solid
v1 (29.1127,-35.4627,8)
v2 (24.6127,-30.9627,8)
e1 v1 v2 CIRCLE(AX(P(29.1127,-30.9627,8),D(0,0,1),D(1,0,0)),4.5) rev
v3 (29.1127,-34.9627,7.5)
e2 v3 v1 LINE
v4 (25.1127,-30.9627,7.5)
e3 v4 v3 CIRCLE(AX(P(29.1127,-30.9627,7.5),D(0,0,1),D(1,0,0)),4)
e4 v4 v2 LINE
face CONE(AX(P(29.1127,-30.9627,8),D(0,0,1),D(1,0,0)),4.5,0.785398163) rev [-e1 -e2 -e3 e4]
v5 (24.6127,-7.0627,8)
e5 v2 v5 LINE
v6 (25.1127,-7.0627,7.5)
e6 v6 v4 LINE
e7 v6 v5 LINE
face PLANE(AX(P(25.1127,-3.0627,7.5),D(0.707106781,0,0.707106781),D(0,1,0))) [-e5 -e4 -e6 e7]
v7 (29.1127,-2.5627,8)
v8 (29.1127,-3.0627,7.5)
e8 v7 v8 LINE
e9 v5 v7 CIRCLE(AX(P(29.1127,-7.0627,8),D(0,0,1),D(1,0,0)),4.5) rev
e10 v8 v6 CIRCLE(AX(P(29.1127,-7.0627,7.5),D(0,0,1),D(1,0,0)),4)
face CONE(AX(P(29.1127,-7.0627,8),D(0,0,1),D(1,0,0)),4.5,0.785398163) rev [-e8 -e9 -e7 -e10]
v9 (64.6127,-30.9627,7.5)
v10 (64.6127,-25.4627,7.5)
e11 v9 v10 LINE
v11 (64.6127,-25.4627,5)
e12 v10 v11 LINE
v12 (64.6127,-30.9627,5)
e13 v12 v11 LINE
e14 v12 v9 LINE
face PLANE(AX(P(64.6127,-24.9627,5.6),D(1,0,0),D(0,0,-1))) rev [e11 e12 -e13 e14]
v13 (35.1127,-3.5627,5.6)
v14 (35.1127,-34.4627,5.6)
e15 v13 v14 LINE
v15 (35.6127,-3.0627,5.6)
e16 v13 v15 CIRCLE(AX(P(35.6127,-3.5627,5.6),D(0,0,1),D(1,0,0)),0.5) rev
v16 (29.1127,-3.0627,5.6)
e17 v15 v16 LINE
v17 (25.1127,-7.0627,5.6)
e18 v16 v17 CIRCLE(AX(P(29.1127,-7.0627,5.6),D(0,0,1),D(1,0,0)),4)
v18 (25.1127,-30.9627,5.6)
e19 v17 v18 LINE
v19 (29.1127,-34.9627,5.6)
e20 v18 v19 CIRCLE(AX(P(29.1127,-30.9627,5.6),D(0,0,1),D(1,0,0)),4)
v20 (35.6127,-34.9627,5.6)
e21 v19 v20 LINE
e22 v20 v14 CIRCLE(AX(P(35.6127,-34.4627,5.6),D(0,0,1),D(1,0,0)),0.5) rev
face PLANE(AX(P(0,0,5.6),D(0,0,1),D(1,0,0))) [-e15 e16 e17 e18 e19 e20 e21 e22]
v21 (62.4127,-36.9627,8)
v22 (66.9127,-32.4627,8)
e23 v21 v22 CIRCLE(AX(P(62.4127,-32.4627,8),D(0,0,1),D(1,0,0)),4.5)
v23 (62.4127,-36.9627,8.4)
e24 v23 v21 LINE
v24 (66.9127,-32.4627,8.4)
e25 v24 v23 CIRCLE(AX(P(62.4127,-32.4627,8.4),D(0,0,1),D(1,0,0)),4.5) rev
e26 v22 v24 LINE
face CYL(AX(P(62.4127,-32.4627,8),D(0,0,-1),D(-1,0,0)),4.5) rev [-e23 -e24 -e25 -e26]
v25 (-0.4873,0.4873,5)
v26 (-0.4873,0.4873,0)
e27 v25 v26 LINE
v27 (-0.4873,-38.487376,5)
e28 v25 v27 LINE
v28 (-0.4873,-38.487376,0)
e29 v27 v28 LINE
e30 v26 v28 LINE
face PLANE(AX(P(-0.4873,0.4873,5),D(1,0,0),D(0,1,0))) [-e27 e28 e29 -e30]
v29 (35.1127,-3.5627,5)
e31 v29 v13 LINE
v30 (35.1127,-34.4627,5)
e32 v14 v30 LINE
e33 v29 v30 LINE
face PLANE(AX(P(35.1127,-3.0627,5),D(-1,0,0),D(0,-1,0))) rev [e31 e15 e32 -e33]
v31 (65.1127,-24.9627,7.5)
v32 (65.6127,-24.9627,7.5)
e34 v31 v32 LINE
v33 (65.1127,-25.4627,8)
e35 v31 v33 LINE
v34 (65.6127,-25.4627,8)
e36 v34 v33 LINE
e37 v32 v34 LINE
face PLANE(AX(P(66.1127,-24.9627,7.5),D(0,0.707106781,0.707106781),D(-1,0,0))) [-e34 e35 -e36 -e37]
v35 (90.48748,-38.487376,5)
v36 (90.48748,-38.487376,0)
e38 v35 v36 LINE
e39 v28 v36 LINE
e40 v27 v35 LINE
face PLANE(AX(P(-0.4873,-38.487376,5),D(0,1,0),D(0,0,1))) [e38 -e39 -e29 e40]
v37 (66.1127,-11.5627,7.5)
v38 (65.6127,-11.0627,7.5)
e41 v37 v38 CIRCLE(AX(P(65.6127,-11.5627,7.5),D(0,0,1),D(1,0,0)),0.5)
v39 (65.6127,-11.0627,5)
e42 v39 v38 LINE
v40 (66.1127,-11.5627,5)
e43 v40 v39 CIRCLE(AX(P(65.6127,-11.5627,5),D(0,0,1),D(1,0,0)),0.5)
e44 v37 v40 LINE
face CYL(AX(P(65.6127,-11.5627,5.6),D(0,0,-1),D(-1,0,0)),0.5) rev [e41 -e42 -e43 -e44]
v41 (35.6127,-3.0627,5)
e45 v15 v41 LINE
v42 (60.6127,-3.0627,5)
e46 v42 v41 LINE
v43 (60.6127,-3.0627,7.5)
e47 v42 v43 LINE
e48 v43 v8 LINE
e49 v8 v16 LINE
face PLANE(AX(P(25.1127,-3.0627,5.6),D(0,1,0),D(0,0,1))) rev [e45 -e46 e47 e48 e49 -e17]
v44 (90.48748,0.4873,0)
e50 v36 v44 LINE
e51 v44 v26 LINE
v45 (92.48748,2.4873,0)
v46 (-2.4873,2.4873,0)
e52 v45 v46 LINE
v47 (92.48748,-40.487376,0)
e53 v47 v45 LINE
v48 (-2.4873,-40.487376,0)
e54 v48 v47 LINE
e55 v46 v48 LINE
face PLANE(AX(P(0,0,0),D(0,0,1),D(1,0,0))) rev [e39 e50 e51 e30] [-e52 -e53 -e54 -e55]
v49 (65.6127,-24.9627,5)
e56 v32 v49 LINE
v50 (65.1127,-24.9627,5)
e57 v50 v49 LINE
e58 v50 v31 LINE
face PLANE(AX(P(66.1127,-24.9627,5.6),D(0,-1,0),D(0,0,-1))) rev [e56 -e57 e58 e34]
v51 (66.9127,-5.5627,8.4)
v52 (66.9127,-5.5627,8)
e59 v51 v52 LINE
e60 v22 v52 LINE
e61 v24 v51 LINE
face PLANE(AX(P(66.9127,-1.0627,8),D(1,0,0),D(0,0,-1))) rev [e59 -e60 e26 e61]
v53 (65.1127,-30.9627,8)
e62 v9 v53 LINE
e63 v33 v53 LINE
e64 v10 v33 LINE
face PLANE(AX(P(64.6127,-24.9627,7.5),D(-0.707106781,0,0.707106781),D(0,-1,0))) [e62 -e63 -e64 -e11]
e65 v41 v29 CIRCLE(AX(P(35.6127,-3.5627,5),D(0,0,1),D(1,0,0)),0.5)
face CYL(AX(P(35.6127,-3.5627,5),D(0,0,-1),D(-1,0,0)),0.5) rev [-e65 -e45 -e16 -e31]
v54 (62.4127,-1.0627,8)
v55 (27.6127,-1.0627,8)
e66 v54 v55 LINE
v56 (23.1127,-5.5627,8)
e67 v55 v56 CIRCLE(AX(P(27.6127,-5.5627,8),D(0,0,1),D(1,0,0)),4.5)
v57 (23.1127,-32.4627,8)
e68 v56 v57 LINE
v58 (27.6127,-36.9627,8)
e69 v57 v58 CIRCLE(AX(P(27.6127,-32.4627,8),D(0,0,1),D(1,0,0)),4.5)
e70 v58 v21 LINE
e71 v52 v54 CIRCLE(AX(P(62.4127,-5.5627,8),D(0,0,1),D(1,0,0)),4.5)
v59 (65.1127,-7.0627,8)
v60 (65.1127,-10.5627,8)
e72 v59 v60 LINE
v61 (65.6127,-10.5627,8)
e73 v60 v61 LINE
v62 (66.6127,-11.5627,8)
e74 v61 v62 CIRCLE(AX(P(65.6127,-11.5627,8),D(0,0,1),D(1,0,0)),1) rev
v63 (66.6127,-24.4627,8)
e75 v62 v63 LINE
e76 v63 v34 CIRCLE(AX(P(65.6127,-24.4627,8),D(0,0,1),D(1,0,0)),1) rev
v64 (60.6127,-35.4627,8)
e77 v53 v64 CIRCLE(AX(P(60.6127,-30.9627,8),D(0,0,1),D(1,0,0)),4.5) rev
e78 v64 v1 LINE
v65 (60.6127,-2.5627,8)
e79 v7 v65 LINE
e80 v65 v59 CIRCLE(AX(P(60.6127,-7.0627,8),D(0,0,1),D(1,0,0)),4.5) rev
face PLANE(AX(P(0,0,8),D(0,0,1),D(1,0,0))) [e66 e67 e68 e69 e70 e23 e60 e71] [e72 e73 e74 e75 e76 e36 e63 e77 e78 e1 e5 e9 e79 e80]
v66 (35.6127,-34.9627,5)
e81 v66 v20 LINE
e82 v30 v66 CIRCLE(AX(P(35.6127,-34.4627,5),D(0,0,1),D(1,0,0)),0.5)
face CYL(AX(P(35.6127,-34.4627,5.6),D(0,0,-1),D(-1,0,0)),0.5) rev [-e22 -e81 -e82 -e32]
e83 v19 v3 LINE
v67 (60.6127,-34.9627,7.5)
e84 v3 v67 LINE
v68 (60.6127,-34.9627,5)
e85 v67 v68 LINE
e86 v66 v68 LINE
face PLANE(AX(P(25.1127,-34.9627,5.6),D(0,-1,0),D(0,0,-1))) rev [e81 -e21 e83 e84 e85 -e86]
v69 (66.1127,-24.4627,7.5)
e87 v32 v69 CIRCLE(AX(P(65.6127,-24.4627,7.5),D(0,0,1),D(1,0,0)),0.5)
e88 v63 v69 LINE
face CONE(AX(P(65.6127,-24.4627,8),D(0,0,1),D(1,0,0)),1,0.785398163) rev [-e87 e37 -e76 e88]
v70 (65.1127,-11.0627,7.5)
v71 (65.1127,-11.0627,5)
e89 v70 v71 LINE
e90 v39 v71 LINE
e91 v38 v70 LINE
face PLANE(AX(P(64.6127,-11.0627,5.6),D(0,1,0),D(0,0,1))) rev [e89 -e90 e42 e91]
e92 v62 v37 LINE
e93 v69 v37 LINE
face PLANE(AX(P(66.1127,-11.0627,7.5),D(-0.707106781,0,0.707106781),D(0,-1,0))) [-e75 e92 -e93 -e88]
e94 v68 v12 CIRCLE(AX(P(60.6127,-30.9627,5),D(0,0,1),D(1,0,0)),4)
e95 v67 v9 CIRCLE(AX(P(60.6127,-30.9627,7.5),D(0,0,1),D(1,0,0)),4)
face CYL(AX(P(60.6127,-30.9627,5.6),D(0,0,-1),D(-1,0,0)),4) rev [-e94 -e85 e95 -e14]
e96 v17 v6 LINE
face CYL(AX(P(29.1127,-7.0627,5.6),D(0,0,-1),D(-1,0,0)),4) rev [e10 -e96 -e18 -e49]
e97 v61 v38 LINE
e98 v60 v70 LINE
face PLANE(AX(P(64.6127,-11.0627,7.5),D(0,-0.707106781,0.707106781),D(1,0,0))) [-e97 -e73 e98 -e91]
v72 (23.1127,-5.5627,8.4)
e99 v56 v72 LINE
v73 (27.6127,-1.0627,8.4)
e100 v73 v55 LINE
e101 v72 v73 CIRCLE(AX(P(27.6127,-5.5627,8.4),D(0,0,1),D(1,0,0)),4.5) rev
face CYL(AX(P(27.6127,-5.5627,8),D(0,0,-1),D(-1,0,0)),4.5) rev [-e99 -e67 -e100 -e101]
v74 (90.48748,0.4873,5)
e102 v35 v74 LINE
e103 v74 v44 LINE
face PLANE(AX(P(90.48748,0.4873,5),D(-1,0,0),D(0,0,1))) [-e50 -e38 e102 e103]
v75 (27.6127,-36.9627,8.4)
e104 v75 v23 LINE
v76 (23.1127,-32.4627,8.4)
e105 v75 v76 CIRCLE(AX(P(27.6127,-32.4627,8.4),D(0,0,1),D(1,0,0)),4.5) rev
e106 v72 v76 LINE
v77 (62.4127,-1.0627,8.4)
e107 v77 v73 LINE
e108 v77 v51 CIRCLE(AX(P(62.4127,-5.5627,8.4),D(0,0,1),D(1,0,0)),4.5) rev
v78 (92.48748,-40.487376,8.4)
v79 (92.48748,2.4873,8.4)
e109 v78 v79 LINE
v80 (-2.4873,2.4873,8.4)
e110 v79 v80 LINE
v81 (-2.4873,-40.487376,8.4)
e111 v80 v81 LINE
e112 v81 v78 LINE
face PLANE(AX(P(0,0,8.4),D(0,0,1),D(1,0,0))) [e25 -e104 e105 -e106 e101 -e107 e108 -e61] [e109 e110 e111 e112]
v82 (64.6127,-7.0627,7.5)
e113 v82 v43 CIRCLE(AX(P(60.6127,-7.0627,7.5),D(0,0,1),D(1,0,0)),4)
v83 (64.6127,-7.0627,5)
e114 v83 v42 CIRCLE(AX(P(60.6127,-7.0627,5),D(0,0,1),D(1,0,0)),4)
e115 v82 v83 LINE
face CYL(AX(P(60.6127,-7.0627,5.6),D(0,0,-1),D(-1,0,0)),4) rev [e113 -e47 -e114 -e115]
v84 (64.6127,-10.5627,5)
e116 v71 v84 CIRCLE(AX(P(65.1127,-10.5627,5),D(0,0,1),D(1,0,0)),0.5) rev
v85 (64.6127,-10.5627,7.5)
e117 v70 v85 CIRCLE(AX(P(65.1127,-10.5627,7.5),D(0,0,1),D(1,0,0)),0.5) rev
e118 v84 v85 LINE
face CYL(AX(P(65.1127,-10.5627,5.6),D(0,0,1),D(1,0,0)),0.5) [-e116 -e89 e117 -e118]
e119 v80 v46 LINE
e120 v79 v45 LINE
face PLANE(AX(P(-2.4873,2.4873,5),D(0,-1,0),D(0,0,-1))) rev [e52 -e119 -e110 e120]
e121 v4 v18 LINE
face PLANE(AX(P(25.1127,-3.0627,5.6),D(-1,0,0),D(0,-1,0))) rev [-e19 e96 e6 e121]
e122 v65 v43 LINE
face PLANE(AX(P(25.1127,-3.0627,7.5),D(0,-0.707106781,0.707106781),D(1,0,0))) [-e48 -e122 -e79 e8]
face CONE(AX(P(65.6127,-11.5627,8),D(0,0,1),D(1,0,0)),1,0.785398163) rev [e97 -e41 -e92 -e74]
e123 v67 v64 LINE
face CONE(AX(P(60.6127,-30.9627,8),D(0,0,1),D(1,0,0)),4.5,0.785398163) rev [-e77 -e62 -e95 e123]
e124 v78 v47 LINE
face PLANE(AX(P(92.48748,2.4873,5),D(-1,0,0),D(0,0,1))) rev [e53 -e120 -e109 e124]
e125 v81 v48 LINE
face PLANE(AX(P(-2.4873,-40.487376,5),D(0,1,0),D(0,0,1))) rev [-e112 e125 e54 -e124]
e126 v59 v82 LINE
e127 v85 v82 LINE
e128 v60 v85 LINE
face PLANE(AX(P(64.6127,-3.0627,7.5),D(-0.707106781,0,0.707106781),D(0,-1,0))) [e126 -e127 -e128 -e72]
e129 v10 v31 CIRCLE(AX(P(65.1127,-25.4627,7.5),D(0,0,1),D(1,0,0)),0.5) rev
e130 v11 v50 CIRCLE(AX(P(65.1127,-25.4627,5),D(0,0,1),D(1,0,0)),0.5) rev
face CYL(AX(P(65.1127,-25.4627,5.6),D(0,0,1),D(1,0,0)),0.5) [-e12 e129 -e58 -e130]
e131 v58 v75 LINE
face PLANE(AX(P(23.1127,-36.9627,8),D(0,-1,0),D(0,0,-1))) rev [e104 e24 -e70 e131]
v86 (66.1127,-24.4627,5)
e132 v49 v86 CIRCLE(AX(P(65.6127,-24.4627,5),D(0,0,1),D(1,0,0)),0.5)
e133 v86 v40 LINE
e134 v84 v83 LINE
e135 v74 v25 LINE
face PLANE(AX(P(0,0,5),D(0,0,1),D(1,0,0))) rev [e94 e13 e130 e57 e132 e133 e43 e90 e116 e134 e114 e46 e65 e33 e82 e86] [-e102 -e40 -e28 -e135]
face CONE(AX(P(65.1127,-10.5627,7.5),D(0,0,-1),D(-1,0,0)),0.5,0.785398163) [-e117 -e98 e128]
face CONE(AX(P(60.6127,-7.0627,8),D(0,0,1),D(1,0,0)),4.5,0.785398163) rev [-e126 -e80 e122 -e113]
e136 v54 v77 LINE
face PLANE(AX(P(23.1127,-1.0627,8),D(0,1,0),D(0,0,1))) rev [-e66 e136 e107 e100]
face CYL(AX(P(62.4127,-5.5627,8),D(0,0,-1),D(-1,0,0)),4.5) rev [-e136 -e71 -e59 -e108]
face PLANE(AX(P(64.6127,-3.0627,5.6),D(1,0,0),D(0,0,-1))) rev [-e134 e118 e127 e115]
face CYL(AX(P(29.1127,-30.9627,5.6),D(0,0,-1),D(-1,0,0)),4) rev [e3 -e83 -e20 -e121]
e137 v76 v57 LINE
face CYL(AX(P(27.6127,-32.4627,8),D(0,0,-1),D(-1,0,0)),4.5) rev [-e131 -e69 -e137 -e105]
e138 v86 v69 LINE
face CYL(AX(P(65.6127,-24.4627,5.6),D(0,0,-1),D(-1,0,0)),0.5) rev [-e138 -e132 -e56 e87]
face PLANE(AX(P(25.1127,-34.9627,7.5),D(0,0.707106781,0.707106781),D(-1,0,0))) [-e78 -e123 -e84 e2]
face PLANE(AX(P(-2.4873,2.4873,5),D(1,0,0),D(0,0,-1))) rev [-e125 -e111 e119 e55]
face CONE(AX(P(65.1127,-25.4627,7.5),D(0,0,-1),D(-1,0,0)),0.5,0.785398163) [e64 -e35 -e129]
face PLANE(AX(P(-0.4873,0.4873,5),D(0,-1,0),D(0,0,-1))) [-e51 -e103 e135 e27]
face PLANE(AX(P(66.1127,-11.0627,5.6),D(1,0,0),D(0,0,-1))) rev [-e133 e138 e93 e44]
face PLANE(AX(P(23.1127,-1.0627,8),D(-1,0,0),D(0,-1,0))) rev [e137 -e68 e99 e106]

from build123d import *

# Parameters (mm, degrees)
SKETCH_2_W          = 94.97478029
SKETCH_2_H          = 42.97467615
SKETCH_2_W_2        = 90.97478029
SKETCH_2_H_2        = 38.97467615
EXTRUDE_1_DEPTH     = 5
SKETCH_3_W          = 94.97478029
SKETCH_3_H          = 42.97467615
EXTRUDE_2_DEPTH     = 3.4
SKETCH_4_W          = 43.8
SKETCH_4_H          = 35.9
CUT_EXTRUDE_1_DEPTH = 0.4
FILLET_1_R          = 4.5
CUT_EXTRUDE_2_DEPTH = 2.4
CUT_EXTRUDE_3_DEPTH = 0.6
FILLET_2_R          = 4
FILLET_3_R          = 0.5
CHAMFER_1_SIZE      = 0.5


with BuildPart() as part:
    # 草图2 → 凸台-拉伸1 (new body)
    with BuildSketch(Plane.XY):
        with Locations((45.00009017, -19.0000381)):
            Rectangle(SKETCH_2_W, SKETCH_2_H)
        with Locations((45.00009017, -19.0000381)):
            Rectangle(SKETCH_2_W_2, SKETCH_2_H_2, mode=Mode.SUBTRACT)
    extrude(amount=EXTRUDE_1_DEPTH)

    # 草图3 → 凸台-拉伸2 (add)
    with BuildSketch(Plane.XY.offset(5)):
        with Locations((45.00009017, -19.0000381)):
            Rectangle(SKETCH_3_W, SKETCH_3_H)
    extrude(amount=EXTRUDE_2_DEPTH)

    # 草图4 → 切除-拉伸1 (cut)
    with BuildSketch(Plane.XY.offset(8.4)):
        with Locations((45.012700025, -19.012700025)):
            Rectangle(SKETCH_4_W, SKETCH_4_H)
    extrude(amount=-CUT_EXTRUDE_1_DEPTH, mode=Mode.SUBTRACT)

    # 圆角1
    fillet_1_edges = [part.edges().sort_by_distance(p)[0] for p in [
        (23.112700025, -36.962700025, 8.2),
        (23.112700025, -1.062700025, 8.2),
        (66.912700025, -1.062700025, 8.2),
        (66.912700025, -36.962700025, 8.2),
    ]]
    fillet(fillet_1_edges, radius=FILLET_1_R)

    # 草图5 → 切除-拉伸2 (cut)
    with BuildSketch(Plane.XY.offset(8)):
        Polygon((25.112700025, -3.062700025), (64.612700025, -3.062700025), (64.612700025, -11.062700025), (66.112700025, -11.062700025), (66.112700025, -24.962700025), (64.612700025, -24.962700025), (64.612700025, -34.962700025), (25.112700025, -34.962700025), align=None)
    extrude(amount=-CUT_EXTRUDE_2_DEPTH, mode=Mode.SUBTRACT)

    # 草图6 → 切除-拉伸3 (cut)
    with BuildSketch(Plane.XY.offset(5.6)):
        Polygon((35.112700025, -3.062700025), (64.612700025, -3.062700025), (64.612700025, -11.062700025), (66.112700025, -11.062700025), (66.112700025, -24.962700025), (64.612700025, -24.962700025), (64.612700025, -34.962700025), (35.112700025, -34.962700025), align=None)
    extrude(amount=-CUT_EXTRUDE_3_DEPTH, mode=Mode.SUBTRACT)

    # 圆角2
    fillet_2_edges = [part.edges().sort_by_distance(p)[0] for p in [
        (25.112700025, -34.962700025, 6.8),
        (25.112700025, -3.062700025, 6.8),
        (64.612700025, -3.062700025, 6.5),
        (64.612700025, -34.962700025, 6.5),
    ]]
    fillet(fillet_2_edges, radius=FILLET_2_R)

    # 圆角3
    fillet_3_edges = [part.edges().sort_by_distance(p)[0] for p in [
        (35.112700025, -34.962700025, 5.3),
        (35.112700025, -3.062700025, 5.3),
        (64.612700025, -11.062700025, 6.5),
        (66.112700025, -11.062700025, 6.5),
        (66.112700025, -24.962700025, 6.5),
        (64.612700025, -24.962700025, 6.5),
    ]]
    fillet(fillet_3_edges, radius=FILLET_3_R)

    # 倒角1
    chamfer_1_edges = [part.edges().sort_by_distance(p)[0] for p in [
        (64.612700025, -28.212700025, 8),
        (44.862700025, -34.962700025, 8),
        (25.112700025, -19.012700025, 8),
        (44.862700025, -3.062700025, 8),
        (63.44112715, -33.79112715, 8),
        (26.284272901, -33.79112715, 8),
        (63.44112715, -4.234272901, 8),
        (26.284272901, -4.234272901, 8),
        (66.112700025, -18.012700025, 8),
        (65.362700025, -24.962700025, 8),
        (65.362700025, -11.062700025, 8),
        (64.612700025, -8.812700025, 8),
        (64.759146635, -25.109146635, 8),
        (64.759146635, -10.916253416, 8),
        (65.966253416, -24.816253416, 8),
        (65.966253416, -11.209146635, 8),
    ]]
    chamfer(chamfer_1_edges, length=CHAMFER_1_SIZE - 0.0001)  # a hair under: the kernel refuses the full size


solid = part.part
